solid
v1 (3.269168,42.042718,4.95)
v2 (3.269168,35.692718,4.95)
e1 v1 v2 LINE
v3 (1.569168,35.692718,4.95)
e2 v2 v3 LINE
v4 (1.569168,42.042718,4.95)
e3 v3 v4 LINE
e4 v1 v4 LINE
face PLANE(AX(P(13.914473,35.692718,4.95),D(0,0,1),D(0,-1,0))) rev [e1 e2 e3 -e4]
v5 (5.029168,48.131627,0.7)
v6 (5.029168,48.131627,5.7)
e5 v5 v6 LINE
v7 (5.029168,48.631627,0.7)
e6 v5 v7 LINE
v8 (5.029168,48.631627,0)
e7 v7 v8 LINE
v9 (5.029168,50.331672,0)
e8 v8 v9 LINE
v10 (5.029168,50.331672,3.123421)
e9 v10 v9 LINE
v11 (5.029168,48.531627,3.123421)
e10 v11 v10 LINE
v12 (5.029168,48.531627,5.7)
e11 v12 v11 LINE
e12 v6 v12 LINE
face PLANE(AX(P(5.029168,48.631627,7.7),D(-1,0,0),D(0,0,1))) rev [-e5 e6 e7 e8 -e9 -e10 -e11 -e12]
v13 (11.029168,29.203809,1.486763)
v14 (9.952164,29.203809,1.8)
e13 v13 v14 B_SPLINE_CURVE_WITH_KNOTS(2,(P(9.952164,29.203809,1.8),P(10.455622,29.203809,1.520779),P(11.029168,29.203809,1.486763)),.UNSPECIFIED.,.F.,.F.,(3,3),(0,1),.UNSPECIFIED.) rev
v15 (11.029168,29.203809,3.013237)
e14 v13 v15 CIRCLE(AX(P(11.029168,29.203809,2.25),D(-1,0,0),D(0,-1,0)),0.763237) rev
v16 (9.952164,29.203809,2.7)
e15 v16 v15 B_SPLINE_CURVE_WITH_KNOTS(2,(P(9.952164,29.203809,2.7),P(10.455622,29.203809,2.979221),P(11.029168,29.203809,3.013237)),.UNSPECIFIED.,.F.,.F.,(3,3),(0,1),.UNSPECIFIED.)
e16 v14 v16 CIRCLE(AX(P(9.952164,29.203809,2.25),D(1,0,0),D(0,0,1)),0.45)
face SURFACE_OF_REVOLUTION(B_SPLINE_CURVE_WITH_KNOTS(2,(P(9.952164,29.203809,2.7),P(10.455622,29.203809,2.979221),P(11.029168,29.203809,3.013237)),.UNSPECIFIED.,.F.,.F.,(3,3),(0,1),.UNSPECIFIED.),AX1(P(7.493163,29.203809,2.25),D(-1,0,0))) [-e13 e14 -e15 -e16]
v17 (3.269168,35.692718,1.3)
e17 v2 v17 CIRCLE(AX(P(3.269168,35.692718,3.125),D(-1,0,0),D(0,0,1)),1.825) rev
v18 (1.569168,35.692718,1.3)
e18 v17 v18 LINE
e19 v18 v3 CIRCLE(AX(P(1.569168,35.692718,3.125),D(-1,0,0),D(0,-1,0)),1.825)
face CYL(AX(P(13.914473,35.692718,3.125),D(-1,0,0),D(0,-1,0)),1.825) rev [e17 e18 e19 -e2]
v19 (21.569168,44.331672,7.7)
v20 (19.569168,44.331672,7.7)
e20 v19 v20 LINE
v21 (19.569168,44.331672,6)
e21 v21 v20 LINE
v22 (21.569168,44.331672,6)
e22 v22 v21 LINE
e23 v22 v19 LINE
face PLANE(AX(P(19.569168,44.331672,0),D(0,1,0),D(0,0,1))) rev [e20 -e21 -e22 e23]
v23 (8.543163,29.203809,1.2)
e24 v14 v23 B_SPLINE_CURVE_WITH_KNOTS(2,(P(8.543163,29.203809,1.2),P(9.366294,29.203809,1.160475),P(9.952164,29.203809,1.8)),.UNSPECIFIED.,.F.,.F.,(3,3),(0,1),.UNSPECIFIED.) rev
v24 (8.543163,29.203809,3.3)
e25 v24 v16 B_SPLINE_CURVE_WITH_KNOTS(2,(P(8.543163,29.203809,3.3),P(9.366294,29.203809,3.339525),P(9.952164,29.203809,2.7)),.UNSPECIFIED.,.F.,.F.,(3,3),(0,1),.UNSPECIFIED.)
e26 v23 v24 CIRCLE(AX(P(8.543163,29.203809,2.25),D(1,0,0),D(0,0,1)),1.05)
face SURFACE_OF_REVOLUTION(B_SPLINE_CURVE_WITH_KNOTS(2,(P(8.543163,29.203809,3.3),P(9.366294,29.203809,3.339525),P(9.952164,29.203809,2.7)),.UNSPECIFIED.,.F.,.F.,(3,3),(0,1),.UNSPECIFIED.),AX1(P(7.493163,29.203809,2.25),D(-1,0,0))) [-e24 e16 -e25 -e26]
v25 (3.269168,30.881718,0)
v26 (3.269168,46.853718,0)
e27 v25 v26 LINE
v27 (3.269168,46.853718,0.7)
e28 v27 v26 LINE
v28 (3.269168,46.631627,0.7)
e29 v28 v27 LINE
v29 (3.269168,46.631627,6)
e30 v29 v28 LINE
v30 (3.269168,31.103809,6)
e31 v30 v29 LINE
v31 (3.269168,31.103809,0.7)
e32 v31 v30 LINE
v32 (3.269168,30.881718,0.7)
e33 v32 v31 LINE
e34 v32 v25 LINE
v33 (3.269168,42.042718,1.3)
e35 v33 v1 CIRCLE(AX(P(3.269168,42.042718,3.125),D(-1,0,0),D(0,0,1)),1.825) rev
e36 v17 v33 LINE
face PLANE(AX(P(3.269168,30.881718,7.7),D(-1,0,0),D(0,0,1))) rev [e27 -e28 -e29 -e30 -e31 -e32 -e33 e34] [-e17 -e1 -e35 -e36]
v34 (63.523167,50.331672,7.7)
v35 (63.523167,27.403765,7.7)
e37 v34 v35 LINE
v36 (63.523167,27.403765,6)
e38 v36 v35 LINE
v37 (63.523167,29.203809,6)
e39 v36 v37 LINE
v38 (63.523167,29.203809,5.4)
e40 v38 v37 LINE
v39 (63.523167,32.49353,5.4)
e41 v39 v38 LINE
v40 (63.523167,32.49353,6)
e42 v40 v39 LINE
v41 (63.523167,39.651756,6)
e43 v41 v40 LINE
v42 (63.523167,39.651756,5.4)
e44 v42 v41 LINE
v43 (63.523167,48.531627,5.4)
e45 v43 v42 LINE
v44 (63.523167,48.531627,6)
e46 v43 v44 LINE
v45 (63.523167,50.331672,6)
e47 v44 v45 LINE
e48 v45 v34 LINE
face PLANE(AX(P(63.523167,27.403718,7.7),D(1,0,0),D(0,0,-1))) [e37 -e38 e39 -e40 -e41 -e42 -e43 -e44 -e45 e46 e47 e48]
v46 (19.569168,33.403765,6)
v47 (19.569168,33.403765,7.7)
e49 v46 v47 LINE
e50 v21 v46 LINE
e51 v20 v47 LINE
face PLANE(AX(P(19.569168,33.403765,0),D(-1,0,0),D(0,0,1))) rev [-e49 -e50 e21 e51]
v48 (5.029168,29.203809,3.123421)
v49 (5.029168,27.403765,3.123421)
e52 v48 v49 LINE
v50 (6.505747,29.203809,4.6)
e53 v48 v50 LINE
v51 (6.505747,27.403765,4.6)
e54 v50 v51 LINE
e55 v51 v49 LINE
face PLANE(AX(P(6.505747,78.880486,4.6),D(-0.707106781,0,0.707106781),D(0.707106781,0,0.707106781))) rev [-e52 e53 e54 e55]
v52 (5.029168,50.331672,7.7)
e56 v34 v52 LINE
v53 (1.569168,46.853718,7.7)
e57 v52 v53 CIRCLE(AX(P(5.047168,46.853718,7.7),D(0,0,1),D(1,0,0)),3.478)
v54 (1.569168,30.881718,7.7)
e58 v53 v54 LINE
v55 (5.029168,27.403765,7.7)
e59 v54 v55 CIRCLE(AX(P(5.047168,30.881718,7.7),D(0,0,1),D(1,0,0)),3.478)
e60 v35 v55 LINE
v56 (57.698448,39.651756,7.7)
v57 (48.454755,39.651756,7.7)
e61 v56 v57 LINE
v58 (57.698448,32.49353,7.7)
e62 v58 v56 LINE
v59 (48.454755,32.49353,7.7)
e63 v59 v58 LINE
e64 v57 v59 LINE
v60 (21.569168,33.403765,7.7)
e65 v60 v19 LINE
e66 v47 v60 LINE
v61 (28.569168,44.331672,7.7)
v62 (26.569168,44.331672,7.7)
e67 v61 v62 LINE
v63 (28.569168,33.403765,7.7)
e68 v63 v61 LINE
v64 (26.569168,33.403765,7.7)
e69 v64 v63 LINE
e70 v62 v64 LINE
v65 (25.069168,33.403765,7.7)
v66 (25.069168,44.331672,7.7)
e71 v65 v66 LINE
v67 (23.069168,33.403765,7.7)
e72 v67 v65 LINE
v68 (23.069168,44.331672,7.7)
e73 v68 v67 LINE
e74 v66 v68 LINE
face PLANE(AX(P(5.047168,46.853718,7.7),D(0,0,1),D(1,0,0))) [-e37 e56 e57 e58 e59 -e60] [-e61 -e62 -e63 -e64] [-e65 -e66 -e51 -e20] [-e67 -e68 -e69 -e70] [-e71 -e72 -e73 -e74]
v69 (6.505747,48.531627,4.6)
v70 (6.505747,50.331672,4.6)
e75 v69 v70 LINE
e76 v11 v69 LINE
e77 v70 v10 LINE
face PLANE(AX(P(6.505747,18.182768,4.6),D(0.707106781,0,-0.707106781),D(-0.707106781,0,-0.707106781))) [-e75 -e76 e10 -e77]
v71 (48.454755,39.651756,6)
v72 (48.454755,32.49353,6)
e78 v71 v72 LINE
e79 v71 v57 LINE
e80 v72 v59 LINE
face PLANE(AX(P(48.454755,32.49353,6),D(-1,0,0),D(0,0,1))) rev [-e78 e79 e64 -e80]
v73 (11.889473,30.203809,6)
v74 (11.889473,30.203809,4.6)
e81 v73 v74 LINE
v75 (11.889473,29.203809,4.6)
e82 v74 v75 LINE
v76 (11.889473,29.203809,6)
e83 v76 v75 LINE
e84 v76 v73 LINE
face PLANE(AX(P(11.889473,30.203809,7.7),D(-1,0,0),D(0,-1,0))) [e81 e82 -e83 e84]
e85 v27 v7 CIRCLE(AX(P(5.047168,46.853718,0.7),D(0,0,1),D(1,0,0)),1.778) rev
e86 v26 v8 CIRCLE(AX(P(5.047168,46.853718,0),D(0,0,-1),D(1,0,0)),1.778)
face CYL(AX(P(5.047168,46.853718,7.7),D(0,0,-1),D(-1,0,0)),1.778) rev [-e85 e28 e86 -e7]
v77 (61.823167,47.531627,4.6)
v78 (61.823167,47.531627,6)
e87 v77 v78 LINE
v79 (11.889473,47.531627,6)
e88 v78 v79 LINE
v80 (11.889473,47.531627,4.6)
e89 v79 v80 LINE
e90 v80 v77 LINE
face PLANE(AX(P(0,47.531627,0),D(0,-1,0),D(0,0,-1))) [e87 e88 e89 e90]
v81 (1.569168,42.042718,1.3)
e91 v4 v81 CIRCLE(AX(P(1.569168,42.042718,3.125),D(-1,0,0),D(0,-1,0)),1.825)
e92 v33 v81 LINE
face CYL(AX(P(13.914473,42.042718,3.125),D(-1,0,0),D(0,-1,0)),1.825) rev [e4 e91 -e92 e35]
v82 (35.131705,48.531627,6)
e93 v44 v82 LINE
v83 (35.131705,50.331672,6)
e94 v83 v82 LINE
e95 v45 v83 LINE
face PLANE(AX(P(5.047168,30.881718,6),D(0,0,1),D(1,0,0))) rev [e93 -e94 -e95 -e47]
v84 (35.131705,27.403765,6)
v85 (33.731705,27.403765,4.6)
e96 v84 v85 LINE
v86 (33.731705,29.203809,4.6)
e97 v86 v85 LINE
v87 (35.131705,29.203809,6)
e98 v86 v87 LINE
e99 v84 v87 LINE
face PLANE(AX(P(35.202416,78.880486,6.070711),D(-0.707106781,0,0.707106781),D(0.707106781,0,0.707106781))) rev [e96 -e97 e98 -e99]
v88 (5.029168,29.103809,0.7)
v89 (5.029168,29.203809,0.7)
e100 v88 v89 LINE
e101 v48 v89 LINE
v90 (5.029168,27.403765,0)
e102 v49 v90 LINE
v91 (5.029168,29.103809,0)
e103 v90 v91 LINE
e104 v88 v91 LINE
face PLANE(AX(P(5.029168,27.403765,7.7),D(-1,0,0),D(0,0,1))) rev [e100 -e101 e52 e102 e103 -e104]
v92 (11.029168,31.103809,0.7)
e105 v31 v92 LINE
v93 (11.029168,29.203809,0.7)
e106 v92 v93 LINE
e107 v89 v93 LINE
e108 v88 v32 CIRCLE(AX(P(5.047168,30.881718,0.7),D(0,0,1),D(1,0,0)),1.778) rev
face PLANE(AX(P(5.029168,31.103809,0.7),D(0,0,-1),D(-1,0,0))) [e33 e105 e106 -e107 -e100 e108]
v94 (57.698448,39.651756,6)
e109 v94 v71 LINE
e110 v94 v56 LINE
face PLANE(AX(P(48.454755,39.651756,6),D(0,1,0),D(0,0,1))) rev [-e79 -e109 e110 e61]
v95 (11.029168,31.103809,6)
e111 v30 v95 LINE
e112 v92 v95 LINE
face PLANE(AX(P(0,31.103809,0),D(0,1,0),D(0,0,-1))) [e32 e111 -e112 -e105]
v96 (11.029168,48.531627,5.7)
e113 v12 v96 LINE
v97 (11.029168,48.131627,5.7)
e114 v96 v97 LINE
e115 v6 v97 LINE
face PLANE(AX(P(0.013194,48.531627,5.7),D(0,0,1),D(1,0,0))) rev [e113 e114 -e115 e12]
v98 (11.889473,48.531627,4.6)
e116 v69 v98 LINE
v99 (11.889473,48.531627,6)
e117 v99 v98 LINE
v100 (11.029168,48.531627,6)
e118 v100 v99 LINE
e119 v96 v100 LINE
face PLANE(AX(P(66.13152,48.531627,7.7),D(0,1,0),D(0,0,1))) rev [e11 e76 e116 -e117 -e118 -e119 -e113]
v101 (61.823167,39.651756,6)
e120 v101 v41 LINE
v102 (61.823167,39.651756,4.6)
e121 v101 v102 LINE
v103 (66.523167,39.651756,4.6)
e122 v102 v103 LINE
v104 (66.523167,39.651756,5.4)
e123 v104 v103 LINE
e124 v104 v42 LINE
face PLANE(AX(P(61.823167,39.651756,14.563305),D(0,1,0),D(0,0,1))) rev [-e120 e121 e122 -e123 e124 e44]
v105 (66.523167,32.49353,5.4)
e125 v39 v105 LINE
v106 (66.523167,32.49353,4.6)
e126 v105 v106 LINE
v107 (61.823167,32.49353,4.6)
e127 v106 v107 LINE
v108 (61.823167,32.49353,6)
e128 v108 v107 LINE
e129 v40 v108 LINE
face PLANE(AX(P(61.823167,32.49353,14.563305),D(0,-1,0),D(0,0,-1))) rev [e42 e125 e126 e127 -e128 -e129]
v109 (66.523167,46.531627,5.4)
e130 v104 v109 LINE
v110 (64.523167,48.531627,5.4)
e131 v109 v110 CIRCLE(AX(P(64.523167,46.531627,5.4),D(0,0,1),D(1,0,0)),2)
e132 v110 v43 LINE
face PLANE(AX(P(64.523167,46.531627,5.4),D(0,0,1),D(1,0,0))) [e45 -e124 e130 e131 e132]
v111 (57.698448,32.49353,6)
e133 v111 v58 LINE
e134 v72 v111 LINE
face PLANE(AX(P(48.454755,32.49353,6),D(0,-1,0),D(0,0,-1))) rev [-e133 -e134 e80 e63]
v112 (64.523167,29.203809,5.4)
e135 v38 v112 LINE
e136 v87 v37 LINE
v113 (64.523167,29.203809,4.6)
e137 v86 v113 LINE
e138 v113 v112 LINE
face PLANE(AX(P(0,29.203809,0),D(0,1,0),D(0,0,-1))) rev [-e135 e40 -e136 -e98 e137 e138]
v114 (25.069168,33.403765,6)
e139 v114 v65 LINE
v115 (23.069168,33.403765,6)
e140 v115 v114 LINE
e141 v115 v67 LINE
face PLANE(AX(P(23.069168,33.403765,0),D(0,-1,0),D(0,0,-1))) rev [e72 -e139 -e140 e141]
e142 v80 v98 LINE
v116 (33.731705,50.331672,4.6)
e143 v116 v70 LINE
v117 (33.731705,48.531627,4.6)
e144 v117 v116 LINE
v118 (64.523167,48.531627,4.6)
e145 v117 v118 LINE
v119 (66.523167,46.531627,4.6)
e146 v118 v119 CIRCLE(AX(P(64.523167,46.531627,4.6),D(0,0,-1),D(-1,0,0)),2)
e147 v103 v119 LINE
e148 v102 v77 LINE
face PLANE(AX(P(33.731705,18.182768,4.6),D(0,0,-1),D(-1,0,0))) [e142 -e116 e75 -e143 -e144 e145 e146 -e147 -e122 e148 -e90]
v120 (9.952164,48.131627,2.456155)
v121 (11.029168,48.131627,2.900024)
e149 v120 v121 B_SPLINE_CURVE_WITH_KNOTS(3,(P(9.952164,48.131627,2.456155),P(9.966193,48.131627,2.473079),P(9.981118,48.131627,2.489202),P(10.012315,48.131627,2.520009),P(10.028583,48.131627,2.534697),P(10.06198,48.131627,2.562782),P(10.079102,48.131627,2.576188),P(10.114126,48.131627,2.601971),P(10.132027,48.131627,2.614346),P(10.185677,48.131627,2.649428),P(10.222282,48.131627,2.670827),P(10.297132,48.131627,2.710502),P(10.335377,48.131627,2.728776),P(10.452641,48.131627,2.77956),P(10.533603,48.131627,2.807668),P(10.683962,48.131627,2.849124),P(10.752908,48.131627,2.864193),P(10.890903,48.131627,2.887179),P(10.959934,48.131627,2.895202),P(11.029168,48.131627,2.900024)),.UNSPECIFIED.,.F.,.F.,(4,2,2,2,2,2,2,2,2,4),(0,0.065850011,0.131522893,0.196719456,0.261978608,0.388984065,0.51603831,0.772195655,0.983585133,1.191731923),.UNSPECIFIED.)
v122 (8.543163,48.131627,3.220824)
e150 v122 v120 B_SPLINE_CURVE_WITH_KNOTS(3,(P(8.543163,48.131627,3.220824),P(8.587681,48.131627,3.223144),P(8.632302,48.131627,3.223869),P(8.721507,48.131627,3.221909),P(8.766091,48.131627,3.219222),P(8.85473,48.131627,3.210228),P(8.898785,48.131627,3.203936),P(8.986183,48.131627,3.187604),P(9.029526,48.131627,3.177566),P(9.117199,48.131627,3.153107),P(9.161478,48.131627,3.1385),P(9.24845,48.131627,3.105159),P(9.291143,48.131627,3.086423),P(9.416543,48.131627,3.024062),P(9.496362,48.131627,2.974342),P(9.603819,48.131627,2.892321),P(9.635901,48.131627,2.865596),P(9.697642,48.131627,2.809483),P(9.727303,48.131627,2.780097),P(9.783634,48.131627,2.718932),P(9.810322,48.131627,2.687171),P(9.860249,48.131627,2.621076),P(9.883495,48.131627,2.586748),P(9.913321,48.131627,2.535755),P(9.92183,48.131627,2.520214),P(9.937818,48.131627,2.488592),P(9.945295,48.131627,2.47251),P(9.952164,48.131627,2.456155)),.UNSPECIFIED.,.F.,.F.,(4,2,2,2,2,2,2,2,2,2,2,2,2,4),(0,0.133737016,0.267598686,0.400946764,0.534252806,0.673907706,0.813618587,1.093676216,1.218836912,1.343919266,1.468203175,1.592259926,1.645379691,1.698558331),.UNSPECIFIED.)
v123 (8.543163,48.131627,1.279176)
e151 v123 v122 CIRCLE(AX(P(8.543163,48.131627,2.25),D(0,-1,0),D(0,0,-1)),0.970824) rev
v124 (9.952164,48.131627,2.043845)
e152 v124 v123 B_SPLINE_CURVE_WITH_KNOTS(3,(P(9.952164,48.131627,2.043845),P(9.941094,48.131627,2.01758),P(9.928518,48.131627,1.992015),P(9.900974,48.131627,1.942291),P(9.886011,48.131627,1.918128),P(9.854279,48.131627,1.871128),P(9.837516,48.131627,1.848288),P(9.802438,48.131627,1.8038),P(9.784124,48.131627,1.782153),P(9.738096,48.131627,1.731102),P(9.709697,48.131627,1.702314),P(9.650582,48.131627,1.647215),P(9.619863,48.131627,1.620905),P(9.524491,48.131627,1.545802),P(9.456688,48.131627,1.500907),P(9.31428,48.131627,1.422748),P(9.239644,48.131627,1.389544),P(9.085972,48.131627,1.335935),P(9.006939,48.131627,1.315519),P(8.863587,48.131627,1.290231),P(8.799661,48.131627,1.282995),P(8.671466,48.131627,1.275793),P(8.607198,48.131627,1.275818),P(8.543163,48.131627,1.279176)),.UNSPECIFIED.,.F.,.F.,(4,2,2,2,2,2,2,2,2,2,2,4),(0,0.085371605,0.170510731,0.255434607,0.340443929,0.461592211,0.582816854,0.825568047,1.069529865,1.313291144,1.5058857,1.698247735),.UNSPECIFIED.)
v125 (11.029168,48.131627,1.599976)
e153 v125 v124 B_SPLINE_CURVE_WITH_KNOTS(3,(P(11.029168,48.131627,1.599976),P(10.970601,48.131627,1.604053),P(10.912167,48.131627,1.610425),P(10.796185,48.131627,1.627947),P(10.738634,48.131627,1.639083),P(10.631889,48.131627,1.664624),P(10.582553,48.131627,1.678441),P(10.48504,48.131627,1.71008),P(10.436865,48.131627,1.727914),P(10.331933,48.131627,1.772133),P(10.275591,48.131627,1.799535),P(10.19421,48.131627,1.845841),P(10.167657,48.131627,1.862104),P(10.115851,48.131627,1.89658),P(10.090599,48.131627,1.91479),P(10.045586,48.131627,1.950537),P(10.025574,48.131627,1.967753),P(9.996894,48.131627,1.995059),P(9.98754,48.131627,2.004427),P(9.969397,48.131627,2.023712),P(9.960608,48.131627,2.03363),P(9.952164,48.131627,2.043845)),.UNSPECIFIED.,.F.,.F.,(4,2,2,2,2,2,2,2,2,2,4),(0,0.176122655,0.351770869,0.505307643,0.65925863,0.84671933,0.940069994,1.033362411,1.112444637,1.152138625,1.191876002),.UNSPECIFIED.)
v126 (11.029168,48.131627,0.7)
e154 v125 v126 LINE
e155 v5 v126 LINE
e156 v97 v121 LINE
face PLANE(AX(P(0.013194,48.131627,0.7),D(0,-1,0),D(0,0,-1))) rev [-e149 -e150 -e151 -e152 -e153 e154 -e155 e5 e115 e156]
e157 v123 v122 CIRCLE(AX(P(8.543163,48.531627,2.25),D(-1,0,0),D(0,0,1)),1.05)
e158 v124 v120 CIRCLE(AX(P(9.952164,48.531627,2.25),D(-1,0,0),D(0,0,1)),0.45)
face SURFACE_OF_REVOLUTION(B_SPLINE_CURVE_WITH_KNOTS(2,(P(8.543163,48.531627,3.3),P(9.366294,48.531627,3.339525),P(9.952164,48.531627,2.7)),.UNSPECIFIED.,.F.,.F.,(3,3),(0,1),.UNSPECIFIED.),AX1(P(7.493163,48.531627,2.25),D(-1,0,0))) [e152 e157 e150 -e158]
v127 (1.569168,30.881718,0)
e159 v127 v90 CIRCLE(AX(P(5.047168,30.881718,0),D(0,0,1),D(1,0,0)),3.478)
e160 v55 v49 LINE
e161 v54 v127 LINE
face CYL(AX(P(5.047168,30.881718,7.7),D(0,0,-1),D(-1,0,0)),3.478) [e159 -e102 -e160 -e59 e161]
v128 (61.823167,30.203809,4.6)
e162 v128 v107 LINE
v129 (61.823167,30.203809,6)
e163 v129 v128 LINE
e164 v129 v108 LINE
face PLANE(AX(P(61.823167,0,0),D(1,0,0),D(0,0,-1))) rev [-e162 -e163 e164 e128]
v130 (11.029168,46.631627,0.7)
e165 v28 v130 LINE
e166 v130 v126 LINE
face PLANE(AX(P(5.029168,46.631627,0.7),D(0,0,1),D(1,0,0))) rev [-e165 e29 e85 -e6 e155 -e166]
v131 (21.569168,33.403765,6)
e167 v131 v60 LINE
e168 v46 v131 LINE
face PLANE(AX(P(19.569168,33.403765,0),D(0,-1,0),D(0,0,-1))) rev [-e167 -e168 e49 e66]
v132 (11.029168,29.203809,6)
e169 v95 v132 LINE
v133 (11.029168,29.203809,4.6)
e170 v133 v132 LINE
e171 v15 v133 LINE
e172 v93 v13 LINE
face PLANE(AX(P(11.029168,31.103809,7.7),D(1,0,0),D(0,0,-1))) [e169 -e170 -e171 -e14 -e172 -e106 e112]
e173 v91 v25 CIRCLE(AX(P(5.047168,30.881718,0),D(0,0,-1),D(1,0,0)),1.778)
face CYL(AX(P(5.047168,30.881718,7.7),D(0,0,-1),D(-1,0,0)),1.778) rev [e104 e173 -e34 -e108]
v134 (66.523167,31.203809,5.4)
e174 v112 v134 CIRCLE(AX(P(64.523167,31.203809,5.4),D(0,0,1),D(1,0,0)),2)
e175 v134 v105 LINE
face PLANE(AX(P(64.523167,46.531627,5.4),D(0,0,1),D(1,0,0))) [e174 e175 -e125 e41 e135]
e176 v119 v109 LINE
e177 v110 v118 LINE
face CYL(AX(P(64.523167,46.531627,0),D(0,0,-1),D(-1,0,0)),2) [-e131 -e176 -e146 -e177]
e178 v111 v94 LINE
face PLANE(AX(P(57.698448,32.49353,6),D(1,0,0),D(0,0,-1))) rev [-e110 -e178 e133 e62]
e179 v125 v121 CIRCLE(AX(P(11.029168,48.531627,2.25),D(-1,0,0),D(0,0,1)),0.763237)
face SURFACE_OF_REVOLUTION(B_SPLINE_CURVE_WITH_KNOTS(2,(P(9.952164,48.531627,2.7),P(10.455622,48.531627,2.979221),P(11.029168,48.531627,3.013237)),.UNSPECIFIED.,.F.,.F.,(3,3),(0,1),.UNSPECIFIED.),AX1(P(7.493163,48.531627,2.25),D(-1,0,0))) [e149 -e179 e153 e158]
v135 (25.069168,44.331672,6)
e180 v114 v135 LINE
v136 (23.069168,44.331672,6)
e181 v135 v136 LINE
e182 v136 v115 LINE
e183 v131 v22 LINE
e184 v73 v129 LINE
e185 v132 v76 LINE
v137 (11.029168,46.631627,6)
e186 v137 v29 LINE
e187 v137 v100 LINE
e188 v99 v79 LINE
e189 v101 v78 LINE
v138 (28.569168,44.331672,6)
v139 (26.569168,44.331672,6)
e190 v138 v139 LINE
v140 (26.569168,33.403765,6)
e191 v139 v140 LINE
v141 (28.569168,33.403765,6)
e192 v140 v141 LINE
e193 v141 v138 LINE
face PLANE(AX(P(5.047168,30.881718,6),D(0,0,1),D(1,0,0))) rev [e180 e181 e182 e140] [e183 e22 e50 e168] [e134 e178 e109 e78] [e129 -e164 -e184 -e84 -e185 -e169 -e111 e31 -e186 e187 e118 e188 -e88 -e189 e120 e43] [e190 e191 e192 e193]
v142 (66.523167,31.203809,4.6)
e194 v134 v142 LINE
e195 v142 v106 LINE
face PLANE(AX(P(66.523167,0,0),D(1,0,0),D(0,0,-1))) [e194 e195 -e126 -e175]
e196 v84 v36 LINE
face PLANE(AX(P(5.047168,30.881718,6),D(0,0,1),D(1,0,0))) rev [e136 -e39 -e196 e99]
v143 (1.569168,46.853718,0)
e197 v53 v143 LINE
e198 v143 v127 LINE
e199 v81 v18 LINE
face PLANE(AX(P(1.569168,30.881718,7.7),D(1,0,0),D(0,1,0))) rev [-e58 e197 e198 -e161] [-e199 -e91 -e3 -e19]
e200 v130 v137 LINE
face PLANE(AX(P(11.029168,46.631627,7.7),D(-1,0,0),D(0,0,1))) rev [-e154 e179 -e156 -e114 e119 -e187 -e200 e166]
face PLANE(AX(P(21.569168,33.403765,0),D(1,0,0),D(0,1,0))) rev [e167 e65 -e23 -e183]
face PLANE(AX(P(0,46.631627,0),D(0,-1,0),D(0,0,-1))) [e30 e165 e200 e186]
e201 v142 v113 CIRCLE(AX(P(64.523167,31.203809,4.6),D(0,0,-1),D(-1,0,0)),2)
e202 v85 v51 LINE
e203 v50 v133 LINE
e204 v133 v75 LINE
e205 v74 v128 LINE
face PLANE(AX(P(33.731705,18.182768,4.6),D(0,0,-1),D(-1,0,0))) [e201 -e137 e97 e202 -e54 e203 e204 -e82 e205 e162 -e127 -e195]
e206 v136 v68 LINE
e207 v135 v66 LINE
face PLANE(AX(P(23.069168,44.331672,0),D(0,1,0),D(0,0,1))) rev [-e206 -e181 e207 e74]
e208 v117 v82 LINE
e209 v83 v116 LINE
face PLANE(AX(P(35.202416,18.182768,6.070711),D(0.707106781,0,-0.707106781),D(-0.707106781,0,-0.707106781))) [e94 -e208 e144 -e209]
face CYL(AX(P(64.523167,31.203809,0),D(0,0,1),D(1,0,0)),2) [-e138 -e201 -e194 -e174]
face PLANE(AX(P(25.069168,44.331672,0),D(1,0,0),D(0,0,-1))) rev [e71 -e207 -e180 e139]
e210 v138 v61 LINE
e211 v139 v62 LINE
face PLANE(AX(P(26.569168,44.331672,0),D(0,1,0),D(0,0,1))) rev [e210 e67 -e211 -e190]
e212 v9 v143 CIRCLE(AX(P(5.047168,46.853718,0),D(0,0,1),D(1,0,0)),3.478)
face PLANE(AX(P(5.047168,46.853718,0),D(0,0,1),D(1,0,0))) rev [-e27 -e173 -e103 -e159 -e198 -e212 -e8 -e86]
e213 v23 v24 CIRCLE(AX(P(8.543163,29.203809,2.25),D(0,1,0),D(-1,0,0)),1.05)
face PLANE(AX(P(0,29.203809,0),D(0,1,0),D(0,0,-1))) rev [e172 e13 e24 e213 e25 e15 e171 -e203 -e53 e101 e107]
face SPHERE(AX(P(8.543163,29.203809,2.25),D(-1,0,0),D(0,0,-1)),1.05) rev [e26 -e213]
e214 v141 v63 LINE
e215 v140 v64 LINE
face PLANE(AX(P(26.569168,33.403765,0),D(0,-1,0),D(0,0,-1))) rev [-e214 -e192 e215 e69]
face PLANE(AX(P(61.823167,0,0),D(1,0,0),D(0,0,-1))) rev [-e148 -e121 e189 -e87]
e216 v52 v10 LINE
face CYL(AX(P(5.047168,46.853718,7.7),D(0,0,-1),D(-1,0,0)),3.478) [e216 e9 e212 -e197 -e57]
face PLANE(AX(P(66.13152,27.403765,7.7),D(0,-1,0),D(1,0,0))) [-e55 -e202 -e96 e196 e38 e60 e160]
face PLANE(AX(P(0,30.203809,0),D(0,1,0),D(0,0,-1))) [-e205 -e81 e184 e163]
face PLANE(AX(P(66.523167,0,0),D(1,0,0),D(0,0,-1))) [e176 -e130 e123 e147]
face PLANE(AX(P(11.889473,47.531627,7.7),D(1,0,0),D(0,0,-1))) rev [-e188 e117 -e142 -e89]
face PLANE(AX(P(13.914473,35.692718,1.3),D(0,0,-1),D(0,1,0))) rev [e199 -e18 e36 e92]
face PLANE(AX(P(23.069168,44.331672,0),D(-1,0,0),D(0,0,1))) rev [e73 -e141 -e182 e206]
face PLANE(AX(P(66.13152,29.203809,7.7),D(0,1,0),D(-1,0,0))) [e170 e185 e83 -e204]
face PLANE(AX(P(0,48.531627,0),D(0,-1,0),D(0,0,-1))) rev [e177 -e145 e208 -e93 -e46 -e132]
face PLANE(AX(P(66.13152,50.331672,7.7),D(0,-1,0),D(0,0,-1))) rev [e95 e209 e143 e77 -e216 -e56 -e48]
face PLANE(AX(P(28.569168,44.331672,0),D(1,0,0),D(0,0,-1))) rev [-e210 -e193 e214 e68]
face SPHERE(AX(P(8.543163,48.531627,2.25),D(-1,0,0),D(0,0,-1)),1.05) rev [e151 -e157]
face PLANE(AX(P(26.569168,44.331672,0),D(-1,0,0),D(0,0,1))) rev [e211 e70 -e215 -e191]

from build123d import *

# Parameters (mm, degrees)
BOSS_EXTRUDE2_DEPTH       = 7.7
BOSS_EXTRUDE3_DEPTH       = 58.493998982
BOSS_EXTRUDE4_REACH       = 69.972
SKETCH7_W                 = 6
SKETCH7_H                 = 7
BOSS_EXTRUDE5_DEPTH       = 1.9
SKETCH9_W                 = 5
SKETCH9_H                 = 0.4
CUT_EXTRUDE1_DEPTH        = 6
SKETCH10_W                = 51.633694728
SKETCH10_H                = 3.1
BOSS_EXTRUDE6_DEPTH       = 1
MIRROR1_START             = 27.403764687
MIRROR1_DEPTH             = 2.800044537
MIRROR1_START_2           = 29.203809224
MIRROR1_2_DEPTH           = 1
MIRROR1_START_3           = 30.203809224
MIRROR1_3_OUTLINE_W       = 6
MIRROR1_3_OUTLINE_H       = 7
MIRROR1_3_DEPTH           = 0.9
MIRROR1_4_OUTLINE_W       = 0.860304254
MIRROR1_4_OUTLINE_H       = 3.1
MIRROR1_4_DEPTH           = 1.800044537
MIRROR1_START_4           = 5.029168405
MIRROR1_5_OUTLINE_W       = 1
MIRROR1_5_OUTLINE_H       = 3.9
MIRROR1_5_DEPTH           = 6
BOSS_EXTRUDE7_START       = -1.7
BOSS_EXTRUDE7_DEPTH       = 1.7
BOSS_EXTRUDE12_DEPTH      = 3
BOSS_EXTRUDE12_DEPTH_BACK = 1.7
SKETCH14_W                = 1.4
SKETCH14_H                = 19.327817751
FILLET1_R                 = 2
CUT_EXTRUDE2_DEPTH        = 0.6
CUT_EXTRUDE3_DEPTH        = 1.7
SKETCH18_W                = 2
SKETCH18_H                = 2.1
BOSS_EXTRUDE13_DEPTH      = 5.3
SKETCH19_W                = 9.243692919
SKETCH19_H                = 7.158225614
CUT_EXTRUDE4_DEPTH        = 1.7
SKETCH20_W                = 4.7
SKETCH20_H                = 7.158225614
CUT_EXTRUDE5_DEPTH        = 1.4
SKETCH21_W                = 2
SKETCH21_H                = 10.927906825
CUT_EXTRUDE6_DEPTH        = 84.772901086


with BuildPart() as part:
    # Sketch1 → Boss-Extrude2 (new body)
    with BuildSketch(Plane.XY):
        with BuildLine():
            Line((1.569168405, 30.881718108), (1.569168405, 46.853718091))
            ThreePointArc((1.569168405, 46.853718091), (2.581495272, 49.306663259), (5.029168405, 50.331671512))
            Line((5.029168405, 50.331671512), (5.029168405, 48.631626975))
            ThreePointArc((5.029168405, 48.631626975), (3.783584613, 48.104573798), (3.269168405, 46.853718091))
            Line((3.269168405, 46.853718091), (3.269168405, 30.881718108))
            ThreePointArc((3.269168405, 30.881718108), (3.783584613, 29.630862401), (5.029168405, 29.103809224))
            Line((5.029168405, 29.103809224), (5.029168405, 27.403764687))
            ThreePointArc((5.029168405, 27.403764687), (2.581495272, 28.428772939), (1.569168405, 30.881718108))
        make_face()
    extrude(amount=BOSS_EXTRUDE2_DEPTH)

    # Sketch3 → Boss-Extrude3 (add)
    with BuildSketch(Plane(origin=(5.029168405, 0, 0), x_dir=(0, 0, -1), z_dir=(1, 0, 0))):
        Polygon((-7.7, 48.631626975), (-7.7, 50.331671512), (-6.1, 50.331671512), (-6.1, 48.631626975), (-6.1, 48.531626975), (-7.7, 48.531626975), align=None)
    extrude(amount=BOSS_EXTRUDE3_DEPTH)

    # Boss-Extrude4: up to this face of the body (flat: up to its plane)
    boss_extrude4_end = Plane(part.part.faces().sort_by_distance((34.276167896, 48.531626975, 6.9))[0])
    # Sketch4 → Boss-Extrude4 (add, up to the picked face)
    with BuildSketch(Plane(origin=(0, 50.331671512, 0), x_dir=(1, 0, 0), z_dir=(0, 1, 0)), mode=Mode.PRIVATE) as boss_extrude4_sk1:
        Polygon((35.231704884, -6.1), (5.029168405, -6.1), (5.029168405, -3.123421356), (6.505747049, -4.6), (33.731704884, -4.6), (35.202415562, -6.070710678), align=None)
    boss_extrude4_tool1 = split(extrude(boss_extrude4_sk1.sketch, amount=-BOSS_EXTRUDE4_REACH, mode=Mode.PRIVATE), bisect_by=boss_extrude4_end, keep=Keep.BOTH, mode=Mode.PRIVATE)
    add(boss_extrude4_tool1.solids().sort_by(Axis((19.415766, 50.331672, 5.326299), (0, -1, 0)))[0])

    # Sketch7 → Boss-Extrude5 (add)
    with BuildSketch(Plane.XZ.offset(-48.531626975)):
        with Locations((8.029168405, 4.2)):
            Rectangle(SKETCH7_W, SKETCH7_H)
    extrude(amount=BOSS_EXTRUDE5_DEPTH)

    # Sketch8 → Cut-Revolve1 (revolve, cut)
    with BuildSketch(Plane(origin=(0, 48.531626975, 0), x_dir=(1, 0, 0), z_dir=(0, 1, 0))):
        with BuildLine():
            Line((7.493162671, -2.25), (9.593162671, -2.25))
            Line((9.593162671, -2.25), (11.029168405, -2.25))
            Line((11.029168405, -2.25), (11.029168405, -3.013237094))
            add(Edge.make_bspline(
                [(11.029168405, -3.013237094), (10.455622255, -2.979221008), (9.952164105, -2.7)],
                knots=[0, 0, 0, 1, 1, 1], degree=2))
            add(Edge.make_bspline(
                [(8.543162671, -3.3), (9.366293549, -3.339525323), (9.952164105, -2.7)],
                knots=[0, 0, 0, 1, 1, 1], degree=2))
            ThreePointArc((8.543162671, -3.3), (7.800700551, -2.99246212), (7.493162671, -2.25))
        make_face()
    revolve(axis=Axis((7.493162671, 48.531626975, 2.25), (1, 0, 0)), mode=Mode.SUBTRACT)

    # Sketch9 → Cut-Extrude1 (cut)
    with BuildSketch(Plane(origin=(11.029168405, 0, 0), x_dir=(0, 0, -1), z_dir=(1, 0, 0))):
        with Locations((-3.2, 48.331626975)):
            Rectangle(SKETCH9_W, SKETCH9_H)
    extrude(amount=-CUT_EXTRUDE1_DEPTH, mode=Mode.SUBTRACT)

    # Sketch10 → Boss-Extrude6 (add)
    with BuildSketch(Plane(origin=(0, 48.531626975, 0), x_dir=(-1, 0, 0), z_dir=(0, -1, 0))):
        with Locations((-37.706320023, -6.15)):
            Rectangle(SKETCH10_W, SKETCH10_H)
    extrude(amount=BOSS_EXTRUDE6_DEPTH)

    # Mirror1: read off the stored shape, not the designer's step
    # Mirror1 outline → Mirror1 (add)
    with BuildSketch(Plane(origin=(0, 0, 0), x_dir=(1, 0, 0), z_dir=(0, 1, 0)).offset(MIRROR1_START)):
        Polygon((63.523167387, -7.7), (63.523167387, -6.1), (35.231704884, -6.1), (33.731704884, -4.6), (11.889472659, -4.6), (11.889472659, -7.7), align=None)
        Polygon((5.029168405, -7.7), (11.029168405, -7.7), (11.029168405, -4.6), (6.505747049, -4.6), (5.029168405, -3.123421356), align=None)
    extrude(amount=MIRROR1_DEPTH)

    # Mirror1 2 outline → Mirror1 2 (add)
    with BuildSketch(Plane(origin=(0, 0, 0), x_dir=(1, 0, 0), z_dir=(0, 1, 0)).offset(MIRROR1_START_2)):
        Polygon((35.231704884, -6.1), (63.523167387, -6.1), (63.523167387, -4.6), (33.731704884, -4.6), align=None)
    extrude(amount=MIRROR1_2_DEPTH)

    # Mirror1 3 outline → Mirror1 3 (add)
    with BuildSketch(Plane(origin=(0, 0, 0), x_dir=(1, 0, 0), z_dir=(0, 1, 0)).offset(MIRROR1_START_3)):
        with Locations((8.029168405, -4.2)):
            Rectangle(MIRROR1_3_OUTLINE_W, MIRROR1_3_OUTLINE_H)
    extrude(amount=MIRROR1_3_DEPTH)

    # Mirror1 4 outline → Mirror1 4 (add)
    with BuildSketch(Plane(origin=(0, 0, 0), x_dir=(1, 0, 0), z_dir=(0, 1, 0)).offset(MIRROR1_START)):
        with Locations((11.459320532, -6.15)):
            Rectangle(MIRROR1_4_OUTLINE_W, MIRROR1_4_OUTLINE_H)
    extrude(amount=MIRROR1_4_DEPTH)

    # Mirror1 5 outline → Mirror1 5 (add)
    with BuildSketch(Plane.YZ.offset(MIRROR1_START_4)):
        with Locations((29.703809224, 2.65)):
            Rectangle(MIRROR1_5_OUTLINE_W, MIRROR1_5_OUTLINE_H)
    extrude(amount=MIRROR1_5_DEPTH)

    # Mirror1 6 outline → Mirror1 6 (revolve, cut)
    with BuildSketch(Plane(origin=(0, 29.203809224, 2.25), x_dir=(0, 1, 0), z_dir=(0, 0, -1))):
        with BuildLine():
            add(Edge.make_bspline(
                [(0.45, 9.952164105), (0.729221008, 10.455622255), (0.763237094, 11.029168405)],
                knots=[0, 0, 0, 1, 1, 1], degree=2))
            Line((0.763237094, 11.029168405), (0, 11.029168505))
            Line((0, 11.029168505), (0, 7.493162671))
            ThreePointArc((0, 7.493162671), (0.74246212, 7.800700551), (1.05, 8.543162671))
            add(Edge.make_bspline(
                [(1.05, 8.543162671), (1.089525323, 9.366293549), (0.45, 9.952164105)],
                knots=[0, 0, 0, 1, 1, 1], degree=2))
        make_face()
    revolve(axis=Axis((0, 29.203809224, 2.25), (1, 0, 0)), mode=Mode.SUBTRACT)

    # Sketch12 → Boss-Extrude7 (add)
    with BuildSketch(Plane.XY.offset(7.7).offset(BOSS_EXTRUDE7_START)):
        with BuildLine():
            Line((63.523167387, 50.331671512), (5.029168405, 50.331671512))
            ThreePointArc((5.029168405, 50.331671512), (2.581495272, 49.306663259), (1.569168405, 46.853718091))
            Line((1.569168405, 46.853718091), (1.569168405, 30.881718108))
            ThreePointArc((1.569168405, 30.881718108), (2.581495272, 28.428772939), (5.029168405, 27.403764687))
            Line((5.029168405, 27.403764687), (63.523167387, 27.403764687))
            Line((63.523167387, 27.403764687), (63.523167387, 50.331671512))
        make_face()
    extrude(amount=BOSS_EXTRUDE7_DEPTH)

    # Sketch14 → Boss-Extrude12 (add, two sides: drawn at the far end of the back side and taken through both)
    with BuildSketch(Plane(origin=(63.523167387, 0, 0), x_dir=(0, 0, -1), z_dir=(1, 0, 0)).offset(-BOSS_EXTRUDE12_DEPTH_BACK)):
        with Locations((-5.3, 38.8677181)):
            Rectangle(SKETCH14_W, SKETCH14_H)
    extrude(amount=BOSS_EXTRUDE12_DEPTH + BOSS_EXTRUDE12_DEPTH_BACK)

    # Fillet1
    fillet1_edges = [part.edges().sort_by_distance(p)[0] for p in [
        (66.523167387, 48.531626975, 5.3),
        (66.523167387, 29.203809224, 5.3),
    ]]
    fillet(fillet1_edges, radius=FILLET1_R)

    # Sketch15 → Cut-Extrude2 (cut)
    with BuildSketch(Plane.XY.offset(6)):
        with BuildLine():
            Line((63.523167387, 29.203809224), (64.523167387, 29.203809224))
            ThreePointArc((64.523167387, 29.203809224), (65.937380949, 29.789595662), (66.523167387, 31.203809224))
            Line((66.523167387, 31.203809224), (66.523167387, 46.531626975))
            ThreePointArc((66.523167387, 46.531626975), (65.937380949, 47.945840537), (64.523167387, 48.531626975))
            Line((64.523167387, 48.531626975), (63.523167387, 48.531626975))
            Line((63.523167387, 48.531626975), (63.523167387, 29.203809224))
        make_face()
    extrude(amount=-CUT_EXTRUDE2_DEPTH, mode=Mode.SUBTRACT)

    # Sketch16 → Cut-Extrude3 (cut)
    with BuildSketch(Plane.ZY.offset(-1.569168405)):
        with BuildLine():
            Line((1.3, 35.692718099), (1.3, 42.042718099))
            ThreePointArc((1.3, 42.042718099), (3.125, 43.867718099), (4.95, 42.042718099))
            Line((4.95, 42.042718099), (4.95, 35.692718099))
            ThreePointArc((4.95, 35.692718099), (3.125, 33.867718099), (1.3, 35.692718099))
        make_face()
    extrude(amount=-CUT_EXTRUDE3_DEPTH, mode=Mode.SUBTRACT)

    # Sketch18 → Boss-Extrude13 (add)
    with BuildSketch(Plane(origin=(0, 0, 6), x_dir=(-1, 0, 0), z_dir=(0, 0, -1))):
        with Locations((-4.029168405, 47.681626975)):
            Rectangle(SKETCH18_W, SKETCH18_H)
        with Locations((-4.029168405, 30.053809224)):
            Rectangle(SKETCH18_W, SKETCH18_H)
    extrude(amount=BOSS_EXTRUDE13_DEPTH)

    # Sketch19 → Cut-Extrude4 (cut)
    with BuildSketch(Plane.XY.offset(7.7)):
        with Locations((53.076601752, 36.072643067)):
            Rectangle(SKETCH19_W, SKETCH19_H)
    extrude(amount=-CUT_EXTRUDE4_DEPTH, mode=Mode.SUBTRACT)

    # Sketch20 → Cut-Extrude5 (cut)
    with BuildSketch(Plane(origin=(0, 0, 4.6), x_dir=(-1, 0, 0), z_dir=(0, 0, -1))):
        with Locations((-64.173167387, 36.072643067)):
            Rectangle(SKETCH20_W, SKETCH20_H)
    extrude(amount=-CUT_EXTRUDE5_DEPTH, mode=Mode.SUBTRACT)

    # Sketch21 → Cut-Extrude6 (cut, through all)
    with BuildSketch(Plane.XY.offset(7.7)):
        with Locations((20.569168405, 38.867718099)):
            Rectangle(SKETCH21_W, SKETCH21_H)
        with Locations((24.069168405, 38.867718099)):
            Rectangle(SKETCH21_W, SKETCH21_H)
        with Locations((27.569168405, 38.867718099)):
            Rectangle(SKETCH21_W, SKETCH21_H)
    extrude(amount=-CUT_EXTRUDE6_DEPTH, mode=Mode.SUBTRACT)


solid = part.part
